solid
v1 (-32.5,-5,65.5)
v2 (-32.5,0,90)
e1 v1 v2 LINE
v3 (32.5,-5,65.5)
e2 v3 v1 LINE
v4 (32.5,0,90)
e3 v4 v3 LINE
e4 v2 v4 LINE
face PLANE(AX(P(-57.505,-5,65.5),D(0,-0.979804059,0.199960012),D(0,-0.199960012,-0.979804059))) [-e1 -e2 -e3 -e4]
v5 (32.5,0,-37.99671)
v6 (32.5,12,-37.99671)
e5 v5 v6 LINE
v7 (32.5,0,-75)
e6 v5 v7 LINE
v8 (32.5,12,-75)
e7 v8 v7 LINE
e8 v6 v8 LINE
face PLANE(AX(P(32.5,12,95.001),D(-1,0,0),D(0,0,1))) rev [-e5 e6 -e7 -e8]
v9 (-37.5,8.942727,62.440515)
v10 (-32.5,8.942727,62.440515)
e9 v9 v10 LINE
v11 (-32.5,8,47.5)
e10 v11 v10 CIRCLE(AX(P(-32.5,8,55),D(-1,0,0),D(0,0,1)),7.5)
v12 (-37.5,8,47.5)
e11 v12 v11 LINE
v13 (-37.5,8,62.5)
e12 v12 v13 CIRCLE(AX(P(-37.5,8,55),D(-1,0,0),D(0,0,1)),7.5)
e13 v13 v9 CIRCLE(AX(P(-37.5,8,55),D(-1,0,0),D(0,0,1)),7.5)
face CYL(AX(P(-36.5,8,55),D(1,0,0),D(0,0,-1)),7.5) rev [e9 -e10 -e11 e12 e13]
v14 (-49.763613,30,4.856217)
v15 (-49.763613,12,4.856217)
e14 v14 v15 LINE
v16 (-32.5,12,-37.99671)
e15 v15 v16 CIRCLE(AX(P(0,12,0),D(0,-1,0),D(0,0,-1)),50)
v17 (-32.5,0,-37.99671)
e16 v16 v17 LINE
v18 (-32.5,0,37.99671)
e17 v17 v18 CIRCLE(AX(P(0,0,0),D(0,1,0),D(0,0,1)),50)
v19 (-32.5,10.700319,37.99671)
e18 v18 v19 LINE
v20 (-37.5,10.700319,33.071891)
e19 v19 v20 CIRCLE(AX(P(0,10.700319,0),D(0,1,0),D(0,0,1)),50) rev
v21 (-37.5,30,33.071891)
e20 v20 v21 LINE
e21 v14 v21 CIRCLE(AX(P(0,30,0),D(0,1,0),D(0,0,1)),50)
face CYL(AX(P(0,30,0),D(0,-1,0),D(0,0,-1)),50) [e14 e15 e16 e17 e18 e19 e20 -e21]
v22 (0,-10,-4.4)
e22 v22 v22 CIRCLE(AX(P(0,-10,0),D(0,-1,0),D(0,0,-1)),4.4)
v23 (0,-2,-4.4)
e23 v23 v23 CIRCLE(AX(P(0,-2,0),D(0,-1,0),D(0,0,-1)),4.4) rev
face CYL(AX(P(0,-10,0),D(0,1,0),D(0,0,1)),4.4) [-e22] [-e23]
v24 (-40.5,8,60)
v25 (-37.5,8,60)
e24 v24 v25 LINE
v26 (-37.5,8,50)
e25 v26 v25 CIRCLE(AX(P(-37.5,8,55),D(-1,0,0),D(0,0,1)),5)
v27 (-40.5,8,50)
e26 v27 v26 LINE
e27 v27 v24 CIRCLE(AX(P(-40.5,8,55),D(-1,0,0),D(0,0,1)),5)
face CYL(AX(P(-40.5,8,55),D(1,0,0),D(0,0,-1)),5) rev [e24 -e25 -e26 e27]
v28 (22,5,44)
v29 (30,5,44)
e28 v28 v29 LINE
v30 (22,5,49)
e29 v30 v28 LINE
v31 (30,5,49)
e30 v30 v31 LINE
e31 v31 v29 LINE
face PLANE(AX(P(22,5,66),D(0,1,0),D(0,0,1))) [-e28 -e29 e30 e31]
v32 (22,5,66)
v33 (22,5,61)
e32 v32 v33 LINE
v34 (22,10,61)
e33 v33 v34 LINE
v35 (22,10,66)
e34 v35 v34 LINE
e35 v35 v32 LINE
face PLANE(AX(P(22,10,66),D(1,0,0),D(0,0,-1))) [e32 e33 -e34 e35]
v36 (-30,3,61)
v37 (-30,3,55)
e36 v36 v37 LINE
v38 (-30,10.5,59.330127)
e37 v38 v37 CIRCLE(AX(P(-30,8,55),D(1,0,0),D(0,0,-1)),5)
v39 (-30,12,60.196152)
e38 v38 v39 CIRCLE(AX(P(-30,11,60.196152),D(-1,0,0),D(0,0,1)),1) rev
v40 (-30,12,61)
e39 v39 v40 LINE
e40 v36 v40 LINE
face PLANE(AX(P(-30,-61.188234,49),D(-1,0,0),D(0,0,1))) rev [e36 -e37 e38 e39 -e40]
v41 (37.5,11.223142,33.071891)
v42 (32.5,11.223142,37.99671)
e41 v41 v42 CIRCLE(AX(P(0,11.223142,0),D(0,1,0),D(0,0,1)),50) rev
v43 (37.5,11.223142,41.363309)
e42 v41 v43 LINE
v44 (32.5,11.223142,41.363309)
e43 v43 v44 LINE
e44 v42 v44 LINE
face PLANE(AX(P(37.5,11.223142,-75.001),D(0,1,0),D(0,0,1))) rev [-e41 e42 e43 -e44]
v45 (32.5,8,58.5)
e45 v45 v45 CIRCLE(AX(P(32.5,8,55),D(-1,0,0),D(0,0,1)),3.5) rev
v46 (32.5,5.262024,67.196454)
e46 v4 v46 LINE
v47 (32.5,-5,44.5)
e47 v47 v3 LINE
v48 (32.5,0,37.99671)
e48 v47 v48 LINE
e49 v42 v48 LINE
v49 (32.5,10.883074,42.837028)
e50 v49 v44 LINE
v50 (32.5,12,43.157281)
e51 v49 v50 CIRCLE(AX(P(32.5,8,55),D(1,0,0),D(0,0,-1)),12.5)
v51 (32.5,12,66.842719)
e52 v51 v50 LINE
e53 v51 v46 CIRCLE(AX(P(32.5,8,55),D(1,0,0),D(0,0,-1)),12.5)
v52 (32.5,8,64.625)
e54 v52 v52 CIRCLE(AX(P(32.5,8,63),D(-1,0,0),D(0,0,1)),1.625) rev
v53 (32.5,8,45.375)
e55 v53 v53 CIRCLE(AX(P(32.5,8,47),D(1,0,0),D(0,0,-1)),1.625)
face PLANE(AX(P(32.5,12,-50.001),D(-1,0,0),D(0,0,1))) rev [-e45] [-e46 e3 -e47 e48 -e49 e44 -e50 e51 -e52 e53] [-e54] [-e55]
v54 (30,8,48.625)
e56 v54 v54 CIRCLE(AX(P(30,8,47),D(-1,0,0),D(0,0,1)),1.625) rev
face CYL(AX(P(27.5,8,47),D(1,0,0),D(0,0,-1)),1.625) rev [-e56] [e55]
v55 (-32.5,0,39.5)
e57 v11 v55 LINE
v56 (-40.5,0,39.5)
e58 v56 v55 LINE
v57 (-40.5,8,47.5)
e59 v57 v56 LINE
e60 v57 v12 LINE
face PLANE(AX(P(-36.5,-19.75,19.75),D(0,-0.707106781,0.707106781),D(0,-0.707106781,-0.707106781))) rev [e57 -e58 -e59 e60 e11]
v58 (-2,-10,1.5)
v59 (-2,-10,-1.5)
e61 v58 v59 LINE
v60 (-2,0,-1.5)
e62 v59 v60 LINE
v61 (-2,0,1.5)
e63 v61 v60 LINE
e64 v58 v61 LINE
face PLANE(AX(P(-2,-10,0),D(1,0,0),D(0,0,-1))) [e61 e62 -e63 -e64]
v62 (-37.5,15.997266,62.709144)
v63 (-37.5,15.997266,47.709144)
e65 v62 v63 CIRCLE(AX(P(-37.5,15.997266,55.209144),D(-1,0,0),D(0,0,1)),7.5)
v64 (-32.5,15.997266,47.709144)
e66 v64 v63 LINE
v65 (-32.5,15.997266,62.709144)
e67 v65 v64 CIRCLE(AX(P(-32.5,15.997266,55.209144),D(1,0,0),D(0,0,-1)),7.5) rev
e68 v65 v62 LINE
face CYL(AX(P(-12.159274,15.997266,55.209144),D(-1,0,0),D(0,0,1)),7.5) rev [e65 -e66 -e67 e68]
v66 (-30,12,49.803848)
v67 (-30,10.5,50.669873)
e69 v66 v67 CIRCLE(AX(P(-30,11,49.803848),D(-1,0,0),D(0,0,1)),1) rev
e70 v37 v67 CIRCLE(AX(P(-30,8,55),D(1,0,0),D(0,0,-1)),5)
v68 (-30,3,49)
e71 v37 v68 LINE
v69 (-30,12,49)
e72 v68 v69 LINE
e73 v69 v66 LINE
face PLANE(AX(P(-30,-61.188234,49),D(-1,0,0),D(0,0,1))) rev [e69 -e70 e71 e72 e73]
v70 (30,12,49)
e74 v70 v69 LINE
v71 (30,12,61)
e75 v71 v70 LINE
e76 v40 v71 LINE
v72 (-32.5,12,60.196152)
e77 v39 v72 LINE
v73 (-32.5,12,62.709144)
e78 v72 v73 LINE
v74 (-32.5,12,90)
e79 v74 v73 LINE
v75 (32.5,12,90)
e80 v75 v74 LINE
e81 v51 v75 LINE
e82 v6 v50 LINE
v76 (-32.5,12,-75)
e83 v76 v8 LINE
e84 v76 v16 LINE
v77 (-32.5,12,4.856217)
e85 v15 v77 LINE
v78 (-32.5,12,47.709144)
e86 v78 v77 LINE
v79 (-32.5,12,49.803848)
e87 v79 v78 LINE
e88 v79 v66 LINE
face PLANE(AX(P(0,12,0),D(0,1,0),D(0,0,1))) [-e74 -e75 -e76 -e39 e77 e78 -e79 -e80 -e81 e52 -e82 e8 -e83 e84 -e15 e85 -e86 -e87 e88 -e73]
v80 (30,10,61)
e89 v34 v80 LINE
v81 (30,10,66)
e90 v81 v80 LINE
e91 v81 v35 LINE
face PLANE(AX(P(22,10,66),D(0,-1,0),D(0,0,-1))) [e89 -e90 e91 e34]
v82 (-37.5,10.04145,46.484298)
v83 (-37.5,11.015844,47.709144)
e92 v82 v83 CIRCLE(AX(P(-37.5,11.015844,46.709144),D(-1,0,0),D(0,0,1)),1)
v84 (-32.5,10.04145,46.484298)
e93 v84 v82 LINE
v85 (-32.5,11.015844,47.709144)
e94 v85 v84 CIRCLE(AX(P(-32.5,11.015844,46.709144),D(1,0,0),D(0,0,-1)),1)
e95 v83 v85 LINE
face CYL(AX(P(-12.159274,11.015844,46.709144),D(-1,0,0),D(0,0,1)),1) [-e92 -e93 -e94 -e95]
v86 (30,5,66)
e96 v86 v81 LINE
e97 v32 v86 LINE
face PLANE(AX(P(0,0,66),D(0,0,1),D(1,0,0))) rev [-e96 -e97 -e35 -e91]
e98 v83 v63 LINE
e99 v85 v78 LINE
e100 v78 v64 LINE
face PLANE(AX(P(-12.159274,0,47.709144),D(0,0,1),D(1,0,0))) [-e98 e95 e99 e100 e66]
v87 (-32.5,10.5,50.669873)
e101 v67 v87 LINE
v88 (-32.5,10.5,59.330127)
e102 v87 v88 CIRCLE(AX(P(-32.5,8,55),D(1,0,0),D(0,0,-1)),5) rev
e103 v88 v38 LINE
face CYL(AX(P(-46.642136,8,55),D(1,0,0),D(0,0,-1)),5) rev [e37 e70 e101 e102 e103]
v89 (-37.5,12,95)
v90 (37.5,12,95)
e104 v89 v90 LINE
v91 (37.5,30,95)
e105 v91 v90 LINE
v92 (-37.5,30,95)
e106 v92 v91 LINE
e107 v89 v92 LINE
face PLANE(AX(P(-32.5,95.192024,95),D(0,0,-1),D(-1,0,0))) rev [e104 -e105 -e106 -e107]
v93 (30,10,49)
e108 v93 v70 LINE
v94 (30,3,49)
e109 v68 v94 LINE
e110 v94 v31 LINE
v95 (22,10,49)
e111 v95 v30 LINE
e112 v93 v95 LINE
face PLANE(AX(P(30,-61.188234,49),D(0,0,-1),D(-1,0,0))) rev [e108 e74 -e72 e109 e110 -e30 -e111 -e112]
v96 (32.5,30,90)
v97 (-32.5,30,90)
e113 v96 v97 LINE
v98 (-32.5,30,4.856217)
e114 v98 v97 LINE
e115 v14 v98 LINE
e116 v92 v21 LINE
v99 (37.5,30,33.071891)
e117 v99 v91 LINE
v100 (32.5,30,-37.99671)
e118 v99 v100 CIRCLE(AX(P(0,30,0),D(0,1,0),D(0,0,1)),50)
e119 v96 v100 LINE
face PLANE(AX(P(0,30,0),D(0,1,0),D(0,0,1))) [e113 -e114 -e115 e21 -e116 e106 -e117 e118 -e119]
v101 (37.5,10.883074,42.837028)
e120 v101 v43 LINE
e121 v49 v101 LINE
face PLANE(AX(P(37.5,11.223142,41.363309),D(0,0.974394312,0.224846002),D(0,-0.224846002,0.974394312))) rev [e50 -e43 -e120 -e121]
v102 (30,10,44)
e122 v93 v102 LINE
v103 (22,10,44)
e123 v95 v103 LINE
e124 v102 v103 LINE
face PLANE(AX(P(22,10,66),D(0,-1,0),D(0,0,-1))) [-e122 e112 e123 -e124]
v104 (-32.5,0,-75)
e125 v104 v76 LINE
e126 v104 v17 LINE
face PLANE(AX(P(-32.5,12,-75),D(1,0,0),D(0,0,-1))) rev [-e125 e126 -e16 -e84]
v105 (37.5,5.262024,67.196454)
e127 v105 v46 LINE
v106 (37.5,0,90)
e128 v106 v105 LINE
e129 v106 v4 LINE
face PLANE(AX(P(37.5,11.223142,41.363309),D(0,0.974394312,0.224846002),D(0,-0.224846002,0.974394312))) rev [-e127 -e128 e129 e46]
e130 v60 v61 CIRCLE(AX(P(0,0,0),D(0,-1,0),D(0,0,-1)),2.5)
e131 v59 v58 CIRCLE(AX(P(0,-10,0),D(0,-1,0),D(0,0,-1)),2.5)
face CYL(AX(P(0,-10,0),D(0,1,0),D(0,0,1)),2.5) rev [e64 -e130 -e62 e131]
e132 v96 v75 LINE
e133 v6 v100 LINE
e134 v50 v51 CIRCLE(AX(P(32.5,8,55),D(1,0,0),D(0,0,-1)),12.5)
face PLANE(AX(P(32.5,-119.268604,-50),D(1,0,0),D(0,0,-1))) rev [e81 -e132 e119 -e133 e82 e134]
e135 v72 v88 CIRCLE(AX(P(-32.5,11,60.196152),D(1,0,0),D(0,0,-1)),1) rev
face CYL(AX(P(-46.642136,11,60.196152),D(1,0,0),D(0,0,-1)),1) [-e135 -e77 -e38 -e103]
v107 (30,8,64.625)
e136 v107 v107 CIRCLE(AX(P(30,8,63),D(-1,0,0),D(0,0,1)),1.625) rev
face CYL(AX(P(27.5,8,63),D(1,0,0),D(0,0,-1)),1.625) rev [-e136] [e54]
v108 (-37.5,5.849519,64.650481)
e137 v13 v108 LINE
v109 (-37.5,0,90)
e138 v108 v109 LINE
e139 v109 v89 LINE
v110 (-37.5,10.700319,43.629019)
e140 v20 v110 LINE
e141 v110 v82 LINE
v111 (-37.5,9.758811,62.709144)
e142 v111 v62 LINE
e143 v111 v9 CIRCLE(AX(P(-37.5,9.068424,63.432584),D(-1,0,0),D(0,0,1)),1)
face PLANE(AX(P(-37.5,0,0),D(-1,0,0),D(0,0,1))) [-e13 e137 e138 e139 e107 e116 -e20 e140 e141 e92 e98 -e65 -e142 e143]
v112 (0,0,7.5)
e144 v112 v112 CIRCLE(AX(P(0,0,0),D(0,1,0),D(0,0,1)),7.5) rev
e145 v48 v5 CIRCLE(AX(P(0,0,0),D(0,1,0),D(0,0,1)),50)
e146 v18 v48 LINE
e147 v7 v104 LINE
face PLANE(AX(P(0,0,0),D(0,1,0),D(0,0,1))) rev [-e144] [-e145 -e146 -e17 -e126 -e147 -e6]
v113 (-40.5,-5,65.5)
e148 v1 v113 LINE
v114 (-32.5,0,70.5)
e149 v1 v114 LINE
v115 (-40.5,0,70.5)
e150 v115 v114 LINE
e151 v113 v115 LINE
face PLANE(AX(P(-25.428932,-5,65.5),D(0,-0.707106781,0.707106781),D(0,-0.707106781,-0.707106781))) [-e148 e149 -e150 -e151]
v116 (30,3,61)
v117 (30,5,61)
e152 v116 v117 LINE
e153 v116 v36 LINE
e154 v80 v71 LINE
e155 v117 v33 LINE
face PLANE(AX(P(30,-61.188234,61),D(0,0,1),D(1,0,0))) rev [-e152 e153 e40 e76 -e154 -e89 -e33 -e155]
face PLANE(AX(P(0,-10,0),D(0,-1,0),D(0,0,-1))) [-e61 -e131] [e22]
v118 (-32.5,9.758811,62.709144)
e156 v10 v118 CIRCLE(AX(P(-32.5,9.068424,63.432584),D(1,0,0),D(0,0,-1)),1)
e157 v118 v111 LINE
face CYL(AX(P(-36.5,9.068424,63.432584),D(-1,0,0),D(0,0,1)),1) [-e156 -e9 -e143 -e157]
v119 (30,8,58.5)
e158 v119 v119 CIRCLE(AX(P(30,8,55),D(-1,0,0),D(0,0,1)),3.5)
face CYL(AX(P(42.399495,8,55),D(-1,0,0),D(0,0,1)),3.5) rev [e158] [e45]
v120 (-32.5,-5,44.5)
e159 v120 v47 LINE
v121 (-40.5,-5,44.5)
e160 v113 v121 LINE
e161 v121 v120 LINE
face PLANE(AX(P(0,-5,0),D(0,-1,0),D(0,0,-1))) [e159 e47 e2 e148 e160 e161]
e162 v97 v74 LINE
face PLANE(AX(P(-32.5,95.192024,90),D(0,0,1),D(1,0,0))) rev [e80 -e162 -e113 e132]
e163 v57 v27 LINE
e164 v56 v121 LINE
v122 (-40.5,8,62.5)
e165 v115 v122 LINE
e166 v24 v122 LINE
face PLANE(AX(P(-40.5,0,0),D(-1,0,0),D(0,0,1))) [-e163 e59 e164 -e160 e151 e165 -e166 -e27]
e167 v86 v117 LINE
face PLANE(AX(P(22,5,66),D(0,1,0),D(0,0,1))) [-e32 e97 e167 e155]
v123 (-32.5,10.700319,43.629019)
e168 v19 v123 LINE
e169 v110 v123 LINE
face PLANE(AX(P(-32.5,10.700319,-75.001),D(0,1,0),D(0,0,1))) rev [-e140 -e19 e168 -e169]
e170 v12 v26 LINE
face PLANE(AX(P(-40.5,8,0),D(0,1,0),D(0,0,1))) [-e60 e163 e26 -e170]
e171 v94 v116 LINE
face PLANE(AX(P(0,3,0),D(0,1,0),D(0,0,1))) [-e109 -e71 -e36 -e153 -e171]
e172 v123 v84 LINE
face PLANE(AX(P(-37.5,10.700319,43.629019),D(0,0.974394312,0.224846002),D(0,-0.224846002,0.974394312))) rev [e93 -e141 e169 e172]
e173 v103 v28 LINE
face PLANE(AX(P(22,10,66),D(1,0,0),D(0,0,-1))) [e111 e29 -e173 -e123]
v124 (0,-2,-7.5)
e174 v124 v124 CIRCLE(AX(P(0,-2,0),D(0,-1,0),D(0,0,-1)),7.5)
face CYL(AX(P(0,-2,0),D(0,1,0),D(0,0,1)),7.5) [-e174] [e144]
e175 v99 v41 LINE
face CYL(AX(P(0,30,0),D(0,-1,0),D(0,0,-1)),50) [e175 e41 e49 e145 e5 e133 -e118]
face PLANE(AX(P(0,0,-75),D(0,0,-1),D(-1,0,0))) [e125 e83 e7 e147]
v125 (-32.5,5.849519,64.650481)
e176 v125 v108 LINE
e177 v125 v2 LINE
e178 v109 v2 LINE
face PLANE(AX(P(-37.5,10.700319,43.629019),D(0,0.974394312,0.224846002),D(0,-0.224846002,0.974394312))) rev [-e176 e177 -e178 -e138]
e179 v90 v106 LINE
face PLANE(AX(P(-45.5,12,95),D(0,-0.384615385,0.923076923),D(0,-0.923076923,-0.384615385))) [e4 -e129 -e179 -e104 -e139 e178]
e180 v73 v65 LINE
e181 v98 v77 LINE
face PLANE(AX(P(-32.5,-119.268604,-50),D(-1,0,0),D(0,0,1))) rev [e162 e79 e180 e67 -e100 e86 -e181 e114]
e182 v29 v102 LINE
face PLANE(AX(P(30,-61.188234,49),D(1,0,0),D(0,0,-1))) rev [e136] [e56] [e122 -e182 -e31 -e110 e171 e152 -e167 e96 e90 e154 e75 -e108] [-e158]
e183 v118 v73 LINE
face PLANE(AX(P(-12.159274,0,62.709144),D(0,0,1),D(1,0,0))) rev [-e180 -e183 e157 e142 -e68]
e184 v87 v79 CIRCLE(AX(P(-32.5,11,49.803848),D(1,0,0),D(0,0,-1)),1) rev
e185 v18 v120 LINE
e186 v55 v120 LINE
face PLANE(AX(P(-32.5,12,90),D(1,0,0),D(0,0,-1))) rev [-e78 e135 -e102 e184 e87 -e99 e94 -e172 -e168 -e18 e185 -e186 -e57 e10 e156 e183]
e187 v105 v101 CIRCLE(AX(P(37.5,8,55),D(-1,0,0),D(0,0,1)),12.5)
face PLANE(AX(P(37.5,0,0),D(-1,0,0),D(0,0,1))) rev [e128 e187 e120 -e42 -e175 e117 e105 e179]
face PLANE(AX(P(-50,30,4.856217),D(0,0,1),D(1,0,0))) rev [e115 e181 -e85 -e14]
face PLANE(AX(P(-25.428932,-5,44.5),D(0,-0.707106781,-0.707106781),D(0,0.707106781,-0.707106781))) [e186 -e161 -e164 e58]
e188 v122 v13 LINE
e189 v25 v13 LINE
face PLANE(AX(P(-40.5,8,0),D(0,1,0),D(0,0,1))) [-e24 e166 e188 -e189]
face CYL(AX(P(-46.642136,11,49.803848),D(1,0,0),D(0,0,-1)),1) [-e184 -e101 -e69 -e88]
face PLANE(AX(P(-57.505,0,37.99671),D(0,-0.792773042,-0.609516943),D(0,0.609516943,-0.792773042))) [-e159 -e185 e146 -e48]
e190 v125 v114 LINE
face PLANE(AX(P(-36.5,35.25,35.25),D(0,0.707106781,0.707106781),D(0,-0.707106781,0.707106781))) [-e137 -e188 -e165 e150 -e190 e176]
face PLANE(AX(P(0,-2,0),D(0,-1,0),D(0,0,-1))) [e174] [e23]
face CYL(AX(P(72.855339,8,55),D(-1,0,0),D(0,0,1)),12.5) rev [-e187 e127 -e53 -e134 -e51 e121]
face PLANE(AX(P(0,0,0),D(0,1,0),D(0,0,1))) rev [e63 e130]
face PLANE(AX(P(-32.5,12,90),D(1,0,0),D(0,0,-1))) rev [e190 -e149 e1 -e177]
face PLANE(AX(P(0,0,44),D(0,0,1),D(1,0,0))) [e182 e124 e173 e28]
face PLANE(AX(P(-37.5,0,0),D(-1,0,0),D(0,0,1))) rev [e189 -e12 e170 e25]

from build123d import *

# Parameters (mm, degrees)
SKETCH1_R                 = 50
BOSS_EXTRUDE1_DEPTH       = 30
SKETCH2_R                 = 4.4
BOSS_EXTRUDE2_DEPTH       = 10
SKETCH3_R                 = 7.5
SKETCH3_R_2               = 4.4
BOSS_EXTRUDE3_DEPTH       = 2
SKETCH4_W                 = 65
SKETCH4_H                 = 100
CUT_EXTRUDE1_DEPTH        = 18
SKETCH5_W                 = 65
SKETCH5_H                 = 12
BOSS_EXTRUDE4_DEPTH       = 40
BOSS_EXTRUDE5_REACH       = 117.758
BOSS_EXTRUDE5_END_RADIUS  = 50
SKETCH6_W                 = 65
SKETCH6_H                 = 12
SKETCH7_W                 = 60
SKETCH7_H                 = 12
CUT_EXTRUDE2_DEPTH        = 9
SKETCH9_R                 = 3.5
CUT_EXTRUDE4_DEPTH        = 2.5
BOSS_EXTRUDE6_DEPTH       = 4
BOSS_EXTRUDE7_DEPTH       = 4
SKETCH15_R                = 5
CUT_EXTRUDE7_DEPTH        = 2.5
SKETCH11_R                = 1.625
CUT_EXTRUDE8_DEPTH        = 5
CUT_EXTRUDE9_DEPTH        = 17
CUT_EXTRUDE9_DEPTH_BACK   = 5
SKETCH16_W                = 8
SKETCH16_H                = 5
SKETCH17_W                = 73
SKETCH17_H                = 21
BOSS_EXTRUDE8_DEPTH       = 5
BOSS_EXTRUDE9_DEPTH       = 65
BOSS_EXTRUDE10_DEPTH      = 8
FILLET2_R                 = 1
SKETCH20_W                = 65
SKETCH20_H                = 5
BOSS_EXTRUDE11_DEPTH      = 18
BOSS_EXTRUDE12_DEPTH      = 65
SKETCH23_W                = 65
SKETCH23_H                = 12
BOSS_EXTRUDE13_DEPTH      = 25
BOSS_EXTRUDE14_REACH      = 158.285
BOSS_EXTRUDE14_END_RADIUS = 50
SKETCH24_W                = 65
SKETCH24_H                = 12
BOSS_EXTRUDE19_DEPTH      = 5
BOSS_EXTRUDE20_REACH      = 132.155
BOSS_EXTRUDE20_END_RADIUS = 50
SKETCH26_W                = 5
SKETCH26_H                = 18.776858115
SKETCH27_R                = 12.5
CUT_EXTRUDE10_DEPTH       = 5
BOSS_EXTRUDE23_DEPTH      = 5
BOSS_EXTRUDE24_REACH      = 134.185
BOSS_EXTRUDE24_END_RADIUS = 50
SKETCH29_W                = 5
SKETCH29_H                = 19.299681274
SKETCH30_R                = 7.5
CUT_EXTRUDE11_DEPTH       = 5
CUT_EXTRUDE14_DEPTH       = 5
FILLET4_R                 = 1
SKETCH35_W                = 42.8529271
SKETCH35_H                = 18
CUT_EXTRUDE15_DEPTH       = 130.349333203


with BuildPart() as part:
    # Sketch1 → Boss-Extrude1 (new body)
    with BuildSketch(Plane(origin=(0, 0, 0), x_dir=(1, 0, 0), z_dir=(0, 1, 0))):
        with Locations(Location((0, 0, 0), (0, 0, 270))):
            Circle(SKETCH1_R)
    extrude(amount=BOSS_EXTRUDE1_DEPTH)

    # Sketch2 → Boss-Extrude2 (add)
    with BuildSketch(Plane.XZ):
        with Locations(Location((0, 0, 0), (0, 0, 90))):
            Circle(SKETCH2_R)
        with BuildLine():
            Line((-2, -1.5), (-2, 1.5))
            ThreePointArc((-2, 1.5), (2.5, 0), (-2, -1.5))
        make_face(mode=Mode.SUBTRACT)
    extrude(amount=BOSS_EXTRUDE2_DEPTH)

    # Sketch3 → Boss-Extrude3 (add)
    with BuildSketch(Plane.XZ):
        with Locations(Location((0, 0, 0), (0, 0, 90))):
            Circle(SKETCH3_R)
        with Locations(Location((0, 0, 0), (0, 0, 270))):
            Circle(SKETCH3_R_2, mode=Mode.SUBTRACT)
    extrude(amount=BOSS_EXTRUDE3_DEPTH)

    # Sketch4 → Cut-Extrude1 (cut)
    with BuildSketch(Plane(origin=(0, 30, 0), x_dir=(1, 0, 0), z_dir=(0, 1, 0))):
        Rectangle(SKETCH4_W, SKETCH4_H)
    extrude(amount=-CUT_EXTRUDE1_DEPTH, mode=Mode.SUBTRACT)



with BuildPart() as body_2:
    # Sketch5 → Boss-Extrude4 (new body)
    with BuildSketch(Plane(origin=(0, 12, 50), x_dir=(1, 0, 0), z_dir=(0, 0, 1))):
        with Locations((0, -6)):
            Rectangle(SKETCH5_W, SKETCH5_H)
    extrude(amount=BOSS_EXTRUDE4_DEPTH)


with BuildPart() as part_1:
    add(part.part)

    add(body_2.part)  # Boss-Extrude5 merges body 2
    # Boss-Extrude5: up to this cylinder (the profile starts outside it)
    boss_extrude5_end = Plane(origin=(0, 6, 0), z_dir=(0, -1, 0)) * Cylinder(BOSS_EXTRUDE5_END_RADIUS, 336.516, mode=Mode.PRIVATE)
    # Sketch6 → Boss-Extrude5 (add, up to the surface)
    with BuildSketch(Plane(origin=(0, 0, 50), x_dir=(-1, 0, 0), z_dir=(0, 0, -1)), mode=Mode.PRIVATE) as boss_extrude5_sk1:
        with Locations((0, 6)):
            Rectangle(SKETCH6_W, SKETCH6_H)
    boss_extrude5_tool1 = extrude(boss_extrude5_sk1.sketch, amount=BOSS_EXTRUDE5_REACH, mode=Mode.PRIVATE) - boss_extrude5_end
    add(boss_extrude5_tool1.solids().sort_by_distance((0, 6, 50))[0])
    add(boss_extrude5_tool1.solids().sort_by_distance((0, 6, 50))[1])

    # Sketch7 → Cut-Extrude2 (cut)
    with BuildSketch(Plane(origin=(0, 12, 0), x_dir=(1, 0, 0), z_dir=(0, 1, 0))):
        with Locations((0, -55)):
            Rectangle(SKETCH7_W, SKETCH7_H)
    extrude(amount=-CUT_EXTRUDE2_DEPTH, mode=Mode.SUBTRACT)

    # Sketch9 → Cut-Extrude4 (cut)
    with BuildSketch(Plane.ZY.offset(-30)):
        with Locations((55, 8)):
            Circle(SKETCH9_R)
    extrude(amount=-CUT_EXTRUDE4_DEPTH, mode=Mode.SUBTRACT)

    # Sketch13 → Boss-Extrude6 (add)
    with BuildSketch(Plane.ZY.offset(32.5)):
        with BuildLine():
            Line((39.5, 0), (47.5, 0))
            Line((47.5, 0), (62.5, 0))
            Line((62.5, 0), (70.5, 0))
            Line((70.5, 0), (62.5, 8))
            ThreePointArc((62.5, 8), (55, 0.5), (47.5, 8))
            Line((47.5, 8), (39.5, 0))
        make_face()
    extrude(amount=BOSS_EXTRUDE6_DEPTH)

    # Sketch14 → Boss-Extrude7 (add)
    with BuildSketch(Plane.ZY.offset(36.5)):
        with BuildLine():
            Line((39.5, 0), (47.5, 8))
            Line((47.5, 8), (50, 8))
            ThreePointArc((50, 8), (55, 3), (60, 8))
            Line((60, 8), (62.5, 8))
            Line((62.5, 8), (70.5, 0))
            Line((70.5, 0), (39.5, 0))
        make_face()
    extrude(amount=BOSS_EXTRUDE7_DEPTH)

    # Sketch15 → Cut-Extrude7 (cut)
    with BuildSketch(Plane(origin=(-30, 0, 0), x_dir=(0, 0, -1), z_dir=(1, 0, 0))):
        with Locations((-55, 8)):
            Circle(SKETCH15_R)
    extrude(amount=-CUT_EXTRUDE7_DEPTH, mode=Mode.SUBTRACT)

    # Sketch11 → Cut-Extrude8 (cut)
    with BuildSketch(Plane(origin=(32.5, 0, 0), x_dir=(0, 0, -1), z_dir=(1, 0, 0))):
        with Locations((-63, 8)):
            Circle(SKETCH11_R)
        with Locations((-47, 8)):
            Circle(SKETCH11_R)
    extrude(amount=-CUT_EXTRUDE8_DEPTH, mode=Mode.SUBTRACT)

    # Sketch16 → Cut-Extrude9 (cut, two sides: drawn at the far end of the back side and taken through both)
    with BuildSketch(Plane.XY.offset(49).offset(-CUT_EXTRUDE9_DEPTH_BACK)):
        with Locations((26, 7.5)):
            Rectangle(SKETCH16_W, SKETCH16_H)
    extrude(amount=CUT_EXTRUDE9_DEPTH + CUT_EXTRUDE9_DEPTH_BACK, mode=Mode.SUBTRACT)

    # Sketch17 → Boss-Extrude8 (add)
    with BuildSketch(Plane.XZ):
        with Locations((-4, 55)):
            Rectangle(SKETCH17_W, SKETCH17_H)
    extrude(amount=BOSS_EXTRUDE8_DEPTH)

    # Sketch18 → Boss-Extrude9 (add)
    with BuildSketch(Plane(origin=(32.5, 0, 0), x_dir=(0, 0, -1), z_dir=(1, 0, 0))):
        Polygon((-65.5, -5), (-90, 0), (-65.5, 0), align=None)
        Polygon((-44.5, -5), (-44.5, 0), (-37.996710384, 0), align=None)
    extrude(amount=-BOSS_EXTRUDE9_DEPTH)

    # Sketch19 → Boss-Extrude10 (add)
    with BuildSketch(Plane.ZY.offset(40.5)):
        Polygon((65.5, -5), (70.5, 0), (65.5, 0), align=None)
        Polygon((44.5, -5), (39.5, 0), (44.5, 0), align=None)
    extrude(amount=-BOSS_EXTRUDE10_DEPTH)

    # Fillet2
    fillet2_edges = [part_1.edges().sort_by_distance(p)[0] for p in [
        (-31.25, 12, 58),
        (-31.25, 12, 52),
    ]]
    fillet(fillet2_edges, radius=FILLET2_R)



with BuildPart() as body_2_2:
    # Sketch20 → Boss-Extrude11 (new body)
    with BuildSketch(Plane(origin=(0, 12, 0), x_dir=(1, 0, 0), z_dir=(0, 1, 0))):
        with Locations((0, -92.5)):
            Rectangle(SKETCH20_W, SKETCH20_H)
    extrude(amount=BOSS_EXTRUDE11_DEPTH)


with BuildPart() as part_2:
    add(part_1.part)

    add(body_2_2.part)  # Boss-Extrude12 merges body 2 2
    # Sketch22 → Boss-Extrude12 (add)
    with BuildSketch(Plane(origin=(32.5, 0, 0), x_dir=(0, 0, -1), z_dir=(1, 0, 0))):
        Polygon((-95, 12), (-90, 0), (-90, 12), align=None)
    extrude(amount=-BOSS_EXTRUDE12_DEPTH)



with BuildPart() as body_2_3:
    # Sketch23 → Boss-Extrude13 (new body)
    with BuildSketch(Plane(origin=(0, 12, -50), x_dir=(-1, 0, 0), z_dir=(0, 0, -1))):
        with Locations((0, -6)):
            Rectangle(SKETCH23_W, SKETCH23_H)
    extrude(amount=BOSS_EXTRUDE13_DEPTH)


with BuildPart() as part_3:
    add(part_2.part)

    add(body_2_3.part)  # Boss-Extrude14 merges body 2 3
    # Boss-Extrude14: up to this cylinder (the profile starts outside it)
    boss_extrude14_end = Plane(origin=(0, 6, 0), z_dir=(0, -1, 0)) * Cylinder(BOSS_EXTRUDE14_END_RADIUS, 417.57, mode=Mode.PRIVATE)
    # Sketch24 → Boss-Extrude14 (add, up to the surface)
    with BuildSketch(Plane.XY.offset(-50), mode=Mode.PRIVATE) as boss_extrude14_sk1:
        with Locations((0, 6)):
            Rectangle(SKETCH24_W, SKETCH24_H)
    boss_extrude14_tool1 = extrude(boss_extrude14_sk1.sketch, amount=BOSS_EXTRUDE14_REACH, mode=Mode.PRIVATE) - boss_extrude14_end
    add(boss_extrude14_tool1.solids().sort_by_distance((0, 6, -50))[0])
    add(boss_extrude14_tool1.solids().sort_by_distance((0, 6, -50))[1])

    # Sketch25 → Boss-Extrude19 (add)
    with BuildSketch(Plane(origin=(32.5, 0, 0), x_dir=(0, 0, -1), z_dir=(1, 0, 0))):
        Polygon((-95, 30), (-95, 12), (-90, 0), (-41.363308514, 11.223141885), (-41.363308514, 30), align=None)
    extrude(amount=BOSS_EXTRUDE19_DEPTH)

    # Boss-Extrude20: up to this cylinder (the profile starts outside it)
    boss_extrude20_end = Plane(origin=(0, 20.611571, 0), z_dir=(0, -1, 0)) * Cylinder(BOSS_EXTRUDE20_END_RADIUS, 365.31, mode=Mode.PRIVATE)
    # Sketch26 → Boss-Extrude20 (add, up to the surface)
    with BuildSketch(Plane(origin=(0, 0, 41.363308514), x_dir=(-1, 0, 0), z_dir=(0, 0, -1)), mode=Mode.PRIVATE) as boss_extrude20_sk1:
        with Locations((-35, 20.611570943)):
            Rectangle(SKETCH26_W, SKETCH26_H)
    boss_extrude20_tool1 = extrude(boss_extrude20_sk1.sketch, amount=BOSS_EXTRUDE20_REACH, mode=Mode.PRIVATE) - boss_extrude20_end
    add(boss_extrude20_tool1.solids().sort_by_distance((35, 20.611571, 41.363309))[0])

    # Sketch27 → Cut-Extrude10 (cut)
    with BuildSketch(Plane(origin=(32.5, 0, 0), x_dir=(0, 0, -1), z_dir=(1, 0, 0))):
        with Locations((-55, 8)):
            Circle(SKETCH27_R)
    extrude(amount=CUT_EXTRUDE10_DEPTH, mode=Mode.SUBTRACT)

    # Sketch28 → Boss-Extrude23 (add)
    with BuildSketch(Plane.ZY.offset(32.5)):
        Polygon((95, 30), (43.629018859, 30), (43.629018859, 10.700318726), (90, 0), (95, 12), align=None)
    extrude(amount=BOSS_EXTRUDE23_DEPTH)

    # Boss-Extrude24: up to this cylinder (the profile starts outside it)
    boss_extrude24_end = Plane(origin=(0, 20.350159, 0), z_dir=(0, -1, 0)) * Cylinder(BOSS_EXTRUDE24_END_RADIUS, 369.37, mode=Mode.PRIVATE)
    # Sketch29 → Boss-Extrude24 (add, up to the surface)
    with BuildSketch(Plane(origin=(0, 0, 43.629018859), x_dir=(-1, 0, 0), z_dir=(0, 0, -1)), mode=Mode.PRIVATE) as boss_extrude24_sk1:
        with Locations((35, 20.350159363)):
            Rectangle(SKETCH29_W, SKETCH29_H)
    boss_extrude24_tool1 = extrude(boss_extrude24_sk1.sketch, amount=BOSS_EXTRUDE24_REACH, mode=Mode.PRIVATE) - boss_extrude24_end
    add(boss_extrude24_tool1.solids().sort_by_distance((-35, 20.350159, 43.629019))[0])

    # Sketch30 → Cut-Extrude11 (cut)
    with BuildSketch(Plane.ZY.offset(32.5)):
        with Locations((55, 8)):
            Circle(SKETCH30_R)
    extrude(amount=CUT_EXTRUDE11_DEPTH, mode=Mode.SUBTRACT)

    # Sketch32 → Cut-Extrude14 (cut)
    with BuildSketch(Plane.ZY.offset(37.5)):
        with BuildLine():
            Line((47.709143816, 9.75881099), (47.709143816, 15.997265712))
            ThreePointArc((47.709143816, 15.997265712), (55.209143816, 23.497265712), (62.709143816, 15.997265712))
            Line((62.709143816, 15.997265712), (62.709143816, 9.75881099))
            Line((62.709143816, 9.75881099), (47.709143816, 9.75881099))
        make_face()
    extrude(amount=-CUT_EXTRUDE14_DEPTH, mode=Mode.SUBTRACT)

    # Fillet4
    # the kernel refuses this fillet: 1 mm, written as the material it takes off along each edge
    with BuildSketch(Plane(origin=(-39.574233457, 9.75881099, 62.290856184), x_dir=(0, 0, 1), z_dir=(1, 0, 0))) as fillet4_piece_1:
        with BuildLine():
            CenterArc((1.141727679, 0.690387208), FILLET4_R, 172.778996455, 50.881771072)
            Line((0.14965899, 0.816084123), (0.129817616, 0.818598062))
            ThreePointArc((0.129817616, 0.818598062), (0.066451188, 0.409578532), (-0.019442283, 0.004690163))
            Line((-0.019442283, 0.004690163), (0, -0.02))
            ThreePointArc((0, -0.02), (0.209143816, -0.02), (0.40381883, -0.013807744))
            Line((0.40381883, -0.013807744), (0.418287631, 0))
        make_face()
    extrude(amount=7.074233457, mode=Mode.SUBTRACT)
    with BuildSketch(Plane(origin=(-40.642583004, 9.75881099, 47.709143816), x_dir=(0, 0.22484600170345923, -0.9743943121334238), z_dir=(1, 0, 0))) as fillet4_piece_2:
        with BuildLine():
            CenterArc((FILLET4_R * 1.2570332015, FILLET4_R), FILLET4_R, 167.006177322, 102.993822678)
            Line((FILLET4_R * 0.282638889366, FILLET4_R * 1.2248460017), (FILLET4_R * 0.263151003123, FILLET4_R * 1.22934292174))
            Line((FILLET4_R * 0.263151003123, FILLET4_R * 1.22934292174), (-FILLET4_R * 0.02514066403, -FILLET4_R * 0.02))
            Line((-FILLET4_R * 0.02514066403, -FILLET4_R * 0.02), (FILLET4_R * 1.2570332015, -FILLET4_R * 0.02))
            Line((FILLET4_R * 1.2570332015, -FILLET4_R * 0.02), (FILLET4_R * 1.2570332015, 0))
        make_face()
    extrude(amount=8.142583004, mode=Mode.SUBTRACT)

    # Sketch35 → Cut-Extrude15 (cut, through all)
    with BuildSketch(Plane(origin=(-32.5, 0, 0), x_dir=(0, 0, -1), z_dir=(1, 0, 0))):
        with Locations((16.570246834, 21)):
            Rectangle(SKETCH35_W, SKETCH35_H)
    extrude(amount=-CUT_EXTRUDE15_DEPTH, mode=Mode.SUBTRACT)


solid = part_3.part
